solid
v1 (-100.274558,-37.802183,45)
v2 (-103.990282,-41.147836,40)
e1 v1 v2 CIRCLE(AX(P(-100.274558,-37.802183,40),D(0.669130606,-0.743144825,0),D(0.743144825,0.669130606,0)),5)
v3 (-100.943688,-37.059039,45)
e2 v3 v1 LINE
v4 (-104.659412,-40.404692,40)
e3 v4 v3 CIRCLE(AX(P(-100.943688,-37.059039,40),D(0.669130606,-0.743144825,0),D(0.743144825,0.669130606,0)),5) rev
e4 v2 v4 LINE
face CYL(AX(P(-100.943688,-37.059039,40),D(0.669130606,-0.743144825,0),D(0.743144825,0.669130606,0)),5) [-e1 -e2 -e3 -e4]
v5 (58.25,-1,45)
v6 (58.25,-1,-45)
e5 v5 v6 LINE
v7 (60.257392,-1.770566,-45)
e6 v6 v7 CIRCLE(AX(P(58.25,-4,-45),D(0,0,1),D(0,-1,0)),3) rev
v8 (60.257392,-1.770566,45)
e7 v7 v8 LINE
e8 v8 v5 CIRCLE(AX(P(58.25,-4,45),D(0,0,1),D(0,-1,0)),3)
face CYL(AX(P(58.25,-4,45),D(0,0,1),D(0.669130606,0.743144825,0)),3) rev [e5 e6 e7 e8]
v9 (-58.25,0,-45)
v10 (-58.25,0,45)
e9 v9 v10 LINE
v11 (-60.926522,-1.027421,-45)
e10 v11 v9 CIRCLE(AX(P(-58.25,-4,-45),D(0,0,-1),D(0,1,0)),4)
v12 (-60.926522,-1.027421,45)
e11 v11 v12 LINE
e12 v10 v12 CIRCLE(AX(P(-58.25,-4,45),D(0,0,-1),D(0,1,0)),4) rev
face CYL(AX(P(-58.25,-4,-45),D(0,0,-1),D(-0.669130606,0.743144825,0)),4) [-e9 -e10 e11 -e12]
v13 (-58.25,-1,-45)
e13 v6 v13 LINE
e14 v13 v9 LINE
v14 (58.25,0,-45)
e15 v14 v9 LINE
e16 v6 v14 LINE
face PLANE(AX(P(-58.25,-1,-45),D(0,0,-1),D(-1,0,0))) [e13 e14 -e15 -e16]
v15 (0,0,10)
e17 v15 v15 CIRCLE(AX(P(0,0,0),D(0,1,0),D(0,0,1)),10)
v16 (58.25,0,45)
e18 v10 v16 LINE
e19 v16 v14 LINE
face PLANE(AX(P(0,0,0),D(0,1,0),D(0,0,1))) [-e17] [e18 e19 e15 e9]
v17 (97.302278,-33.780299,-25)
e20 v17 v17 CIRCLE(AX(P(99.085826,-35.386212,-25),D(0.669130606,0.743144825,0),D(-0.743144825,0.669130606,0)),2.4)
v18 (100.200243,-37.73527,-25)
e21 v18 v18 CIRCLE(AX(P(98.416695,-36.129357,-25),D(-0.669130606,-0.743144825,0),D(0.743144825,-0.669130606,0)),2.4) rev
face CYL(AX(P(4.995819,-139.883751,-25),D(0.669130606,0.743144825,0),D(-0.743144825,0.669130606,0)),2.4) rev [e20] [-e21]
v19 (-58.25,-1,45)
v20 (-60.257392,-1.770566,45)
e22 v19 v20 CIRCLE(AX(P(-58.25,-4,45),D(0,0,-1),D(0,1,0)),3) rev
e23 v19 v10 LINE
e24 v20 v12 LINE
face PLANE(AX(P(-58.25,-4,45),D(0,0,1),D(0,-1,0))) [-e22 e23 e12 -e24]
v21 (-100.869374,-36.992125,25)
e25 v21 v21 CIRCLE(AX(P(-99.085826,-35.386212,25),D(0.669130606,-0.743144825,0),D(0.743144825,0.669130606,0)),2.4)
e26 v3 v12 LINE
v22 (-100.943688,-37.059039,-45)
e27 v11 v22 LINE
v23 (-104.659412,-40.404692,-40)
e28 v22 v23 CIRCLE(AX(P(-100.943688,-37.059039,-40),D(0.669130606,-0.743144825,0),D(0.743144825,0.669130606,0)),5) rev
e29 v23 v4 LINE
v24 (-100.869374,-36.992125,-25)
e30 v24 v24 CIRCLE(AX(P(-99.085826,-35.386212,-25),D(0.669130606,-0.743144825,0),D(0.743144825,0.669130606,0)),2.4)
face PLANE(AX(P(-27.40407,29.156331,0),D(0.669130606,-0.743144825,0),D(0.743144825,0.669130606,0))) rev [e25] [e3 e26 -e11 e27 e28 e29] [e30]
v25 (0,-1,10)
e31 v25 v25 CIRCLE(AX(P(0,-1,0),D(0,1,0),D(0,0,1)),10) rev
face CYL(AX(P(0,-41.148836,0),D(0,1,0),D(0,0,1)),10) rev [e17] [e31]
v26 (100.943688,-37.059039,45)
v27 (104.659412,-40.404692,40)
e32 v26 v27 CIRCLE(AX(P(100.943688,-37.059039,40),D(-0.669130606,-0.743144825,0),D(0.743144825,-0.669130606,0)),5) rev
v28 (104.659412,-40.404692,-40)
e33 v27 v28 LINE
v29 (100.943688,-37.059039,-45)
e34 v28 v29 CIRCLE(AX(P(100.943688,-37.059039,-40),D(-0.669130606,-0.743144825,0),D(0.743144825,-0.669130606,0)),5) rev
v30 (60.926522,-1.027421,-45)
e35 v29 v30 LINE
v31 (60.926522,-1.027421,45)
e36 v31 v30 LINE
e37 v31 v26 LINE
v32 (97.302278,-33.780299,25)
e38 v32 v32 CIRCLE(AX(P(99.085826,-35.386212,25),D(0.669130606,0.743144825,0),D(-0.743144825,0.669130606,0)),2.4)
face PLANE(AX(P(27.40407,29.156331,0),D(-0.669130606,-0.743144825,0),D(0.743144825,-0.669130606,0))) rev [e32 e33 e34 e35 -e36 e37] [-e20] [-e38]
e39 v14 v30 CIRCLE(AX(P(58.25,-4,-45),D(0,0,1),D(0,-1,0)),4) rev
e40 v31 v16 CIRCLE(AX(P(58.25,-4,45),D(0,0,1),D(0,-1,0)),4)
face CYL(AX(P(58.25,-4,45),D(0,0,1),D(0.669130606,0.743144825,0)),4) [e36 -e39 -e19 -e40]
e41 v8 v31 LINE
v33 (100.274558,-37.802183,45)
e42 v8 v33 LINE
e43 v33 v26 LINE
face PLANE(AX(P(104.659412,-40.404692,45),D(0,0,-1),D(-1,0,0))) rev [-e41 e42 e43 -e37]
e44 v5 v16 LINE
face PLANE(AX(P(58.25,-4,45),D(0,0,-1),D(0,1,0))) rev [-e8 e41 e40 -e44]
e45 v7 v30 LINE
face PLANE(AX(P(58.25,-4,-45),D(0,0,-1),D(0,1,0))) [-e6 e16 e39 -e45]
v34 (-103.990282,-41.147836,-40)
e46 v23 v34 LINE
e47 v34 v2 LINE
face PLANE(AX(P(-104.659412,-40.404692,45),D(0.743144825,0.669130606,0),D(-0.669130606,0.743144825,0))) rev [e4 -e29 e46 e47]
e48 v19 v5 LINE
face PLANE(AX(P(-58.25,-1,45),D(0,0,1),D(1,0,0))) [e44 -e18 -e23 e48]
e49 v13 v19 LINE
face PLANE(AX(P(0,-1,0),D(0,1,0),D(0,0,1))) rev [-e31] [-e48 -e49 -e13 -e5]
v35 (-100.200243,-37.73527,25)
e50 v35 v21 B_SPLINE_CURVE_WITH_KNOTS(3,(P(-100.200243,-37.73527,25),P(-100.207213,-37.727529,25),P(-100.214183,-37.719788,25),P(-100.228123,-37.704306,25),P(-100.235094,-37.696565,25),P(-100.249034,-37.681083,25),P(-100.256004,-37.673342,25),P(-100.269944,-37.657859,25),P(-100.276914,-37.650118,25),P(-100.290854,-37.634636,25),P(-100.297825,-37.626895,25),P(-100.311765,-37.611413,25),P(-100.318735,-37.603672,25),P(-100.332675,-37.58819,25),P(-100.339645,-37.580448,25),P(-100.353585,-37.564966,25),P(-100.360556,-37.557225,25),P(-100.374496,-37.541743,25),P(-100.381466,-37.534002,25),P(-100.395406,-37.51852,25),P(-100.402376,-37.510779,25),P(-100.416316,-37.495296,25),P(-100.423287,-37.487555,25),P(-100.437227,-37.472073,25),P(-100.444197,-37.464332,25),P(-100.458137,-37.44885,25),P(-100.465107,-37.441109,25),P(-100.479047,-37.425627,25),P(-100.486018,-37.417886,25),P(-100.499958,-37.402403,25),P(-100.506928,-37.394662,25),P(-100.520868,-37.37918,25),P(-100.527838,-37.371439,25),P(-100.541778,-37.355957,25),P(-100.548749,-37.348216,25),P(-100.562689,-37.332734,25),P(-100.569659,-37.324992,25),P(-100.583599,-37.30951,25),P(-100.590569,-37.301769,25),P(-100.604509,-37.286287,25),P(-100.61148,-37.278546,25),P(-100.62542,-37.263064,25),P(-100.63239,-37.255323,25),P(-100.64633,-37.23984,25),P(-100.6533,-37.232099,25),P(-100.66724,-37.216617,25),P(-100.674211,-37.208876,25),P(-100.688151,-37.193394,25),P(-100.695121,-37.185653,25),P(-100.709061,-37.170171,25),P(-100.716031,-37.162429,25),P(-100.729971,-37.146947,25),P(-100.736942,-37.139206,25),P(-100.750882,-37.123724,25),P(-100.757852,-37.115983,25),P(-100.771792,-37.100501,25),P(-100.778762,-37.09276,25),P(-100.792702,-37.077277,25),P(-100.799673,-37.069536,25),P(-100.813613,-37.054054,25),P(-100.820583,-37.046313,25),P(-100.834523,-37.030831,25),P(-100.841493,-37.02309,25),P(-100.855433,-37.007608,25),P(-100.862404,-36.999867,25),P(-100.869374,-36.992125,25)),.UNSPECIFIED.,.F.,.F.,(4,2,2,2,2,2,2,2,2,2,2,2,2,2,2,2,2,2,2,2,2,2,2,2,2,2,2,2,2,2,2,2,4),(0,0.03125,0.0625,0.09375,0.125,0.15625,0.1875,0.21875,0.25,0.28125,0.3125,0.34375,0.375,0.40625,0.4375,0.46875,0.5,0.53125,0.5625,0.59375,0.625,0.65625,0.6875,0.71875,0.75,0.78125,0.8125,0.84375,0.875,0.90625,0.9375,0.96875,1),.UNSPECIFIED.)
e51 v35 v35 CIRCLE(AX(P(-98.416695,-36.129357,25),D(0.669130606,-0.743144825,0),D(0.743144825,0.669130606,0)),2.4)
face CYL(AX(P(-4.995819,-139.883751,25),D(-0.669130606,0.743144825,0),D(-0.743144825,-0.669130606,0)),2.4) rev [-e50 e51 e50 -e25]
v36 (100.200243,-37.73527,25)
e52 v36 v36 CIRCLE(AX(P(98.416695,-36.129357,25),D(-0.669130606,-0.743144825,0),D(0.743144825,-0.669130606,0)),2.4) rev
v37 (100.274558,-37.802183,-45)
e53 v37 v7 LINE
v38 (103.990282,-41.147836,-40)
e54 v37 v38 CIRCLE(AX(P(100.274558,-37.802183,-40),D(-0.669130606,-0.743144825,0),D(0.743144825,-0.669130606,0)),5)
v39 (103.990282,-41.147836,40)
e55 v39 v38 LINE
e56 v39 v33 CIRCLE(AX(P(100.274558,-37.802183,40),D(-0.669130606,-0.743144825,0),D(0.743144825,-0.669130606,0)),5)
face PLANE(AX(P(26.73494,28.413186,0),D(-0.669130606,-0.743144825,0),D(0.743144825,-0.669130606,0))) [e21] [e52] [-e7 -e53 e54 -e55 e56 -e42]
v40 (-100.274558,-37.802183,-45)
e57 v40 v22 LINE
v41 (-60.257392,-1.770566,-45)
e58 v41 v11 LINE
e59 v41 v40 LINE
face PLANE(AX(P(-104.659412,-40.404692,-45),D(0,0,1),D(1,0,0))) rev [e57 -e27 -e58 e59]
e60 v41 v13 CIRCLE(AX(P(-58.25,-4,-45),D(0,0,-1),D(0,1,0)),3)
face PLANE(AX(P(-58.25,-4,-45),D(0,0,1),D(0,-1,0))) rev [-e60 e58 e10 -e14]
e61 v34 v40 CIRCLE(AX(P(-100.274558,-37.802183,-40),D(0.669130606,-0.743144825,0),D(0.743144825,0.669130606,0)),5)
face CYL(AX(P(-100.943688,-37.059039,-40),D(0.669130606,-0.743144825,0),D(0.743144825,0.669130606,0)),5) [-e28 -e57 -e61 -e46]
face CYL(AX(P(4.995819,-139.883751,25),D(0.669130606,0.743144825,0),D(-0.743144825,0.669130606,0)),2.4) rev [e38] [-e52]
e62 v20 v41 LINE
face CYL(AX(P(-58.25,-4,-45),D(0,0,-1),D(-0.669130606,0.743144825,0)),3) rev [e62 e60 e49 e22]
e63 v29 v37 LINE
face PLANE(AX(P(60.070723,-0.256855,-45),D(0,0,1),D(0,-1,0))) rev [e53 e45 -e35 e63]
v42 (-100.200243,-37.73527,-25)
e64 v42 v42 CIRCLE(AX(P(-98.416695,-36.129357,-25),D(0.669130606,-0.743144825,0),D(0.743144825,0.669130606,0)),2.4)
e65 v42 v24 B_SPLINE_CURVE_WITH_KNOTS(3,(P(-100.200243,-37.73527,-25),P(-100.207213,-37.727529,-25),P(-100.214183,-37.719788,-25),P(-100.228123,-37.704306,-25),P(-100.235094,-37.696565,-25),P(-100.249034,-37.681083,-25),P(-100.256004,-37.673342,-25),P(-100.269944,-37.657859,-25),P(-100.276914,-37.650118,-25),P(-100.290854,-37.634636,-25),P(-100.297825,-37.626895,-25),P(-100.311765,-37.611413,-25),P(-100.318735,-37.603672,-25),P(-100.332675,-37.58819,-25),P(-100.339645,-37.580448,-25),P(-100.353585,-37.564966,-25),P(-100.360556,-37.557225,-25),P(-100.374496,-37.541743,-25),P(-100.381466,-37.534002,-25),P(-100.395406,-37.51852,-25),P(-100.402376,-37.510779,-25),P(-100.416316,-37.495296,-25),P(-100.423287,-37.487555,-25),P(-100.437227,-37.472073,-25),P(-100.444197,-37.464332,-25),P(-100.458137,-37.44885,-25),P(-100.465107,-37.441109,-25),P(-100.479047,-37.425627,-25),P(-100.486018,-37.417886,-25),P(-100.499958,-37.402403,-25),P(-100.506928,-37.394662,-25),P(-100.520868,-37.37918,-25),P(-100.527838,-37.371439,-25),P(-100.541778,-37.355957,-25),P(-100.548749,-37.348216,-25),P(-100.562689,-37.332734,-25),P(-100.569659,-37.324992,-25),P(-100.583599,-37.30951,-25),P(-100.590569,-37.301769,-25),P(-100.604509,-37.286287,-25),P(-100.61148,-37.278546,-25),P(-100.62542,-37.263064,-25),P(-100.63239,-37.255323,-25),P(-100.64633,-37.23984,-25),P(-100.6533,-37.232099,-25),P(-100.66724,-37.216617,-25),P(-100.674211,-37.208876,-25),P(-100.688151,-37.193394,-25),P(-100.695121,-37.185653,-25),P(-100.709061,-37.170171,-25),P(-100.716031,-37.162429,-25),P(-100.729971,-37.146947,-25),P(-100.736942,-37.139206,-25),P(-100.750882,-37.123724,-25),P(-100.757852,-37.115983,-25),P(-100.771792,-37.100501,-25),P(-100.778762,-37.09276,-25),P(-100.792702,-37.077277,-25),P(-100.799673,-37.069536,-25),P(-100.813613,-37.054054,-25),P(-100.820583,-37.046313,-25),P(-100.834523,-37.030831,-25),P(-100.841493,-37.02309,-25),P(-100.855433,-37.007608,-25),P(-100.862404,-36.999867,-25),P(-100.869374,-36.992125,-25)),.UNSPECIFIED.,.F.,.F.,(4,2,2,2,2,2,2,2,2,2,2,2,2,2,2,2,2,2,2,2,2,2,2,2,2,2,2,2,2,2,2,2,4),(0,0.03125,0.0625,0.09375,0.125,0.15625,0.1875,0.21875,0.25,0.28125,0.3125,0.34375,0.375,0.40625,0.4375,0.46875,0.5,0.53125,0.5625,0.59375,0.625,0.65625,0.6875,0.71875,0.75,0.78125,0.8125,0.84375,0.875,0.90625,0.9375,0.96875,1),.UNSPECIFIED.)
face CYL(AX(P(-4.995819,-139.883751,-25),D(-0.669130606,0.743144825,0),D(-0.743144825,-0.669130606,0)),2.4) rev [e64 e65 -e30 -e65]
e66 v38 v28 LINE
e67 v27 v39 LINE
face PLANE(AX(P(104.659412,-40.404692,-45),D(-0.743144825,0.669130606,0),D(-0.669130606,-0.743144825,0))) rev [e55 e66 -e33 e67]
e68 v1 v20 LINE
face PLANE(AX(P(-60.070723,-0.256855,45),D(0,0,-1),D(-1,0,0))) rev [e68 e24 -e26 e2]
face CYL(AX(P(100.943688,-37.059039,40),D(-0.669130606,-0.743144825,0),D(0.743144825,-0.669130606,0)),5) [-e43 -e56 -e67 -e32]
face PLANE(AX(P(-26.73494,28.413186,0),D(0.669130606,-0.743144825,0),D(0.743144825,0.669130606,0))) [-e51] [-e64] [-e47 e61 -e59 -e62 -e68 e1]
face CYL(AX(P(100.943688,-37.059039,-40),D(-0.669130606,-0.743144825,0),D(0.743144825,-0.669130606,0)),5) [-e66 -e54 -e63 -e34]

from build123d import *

# Parameters (mm, degrees)
ESBO_O1_W                 = 116.5
ESBO_O1_H                 = 90
FLANGE_BASE1_DEPTH        = 1
ARESTA_FLANGE1_DEPTH      = 90
ARESTA_FLANGE1_BEND_DEPTH = 90
CORTE_EXTRUS_O1_REACH     = 157.954
ESBO_O12_R                = 2.4
FILETE1_R                 = 5
CORTE_EXTRUS_O2_REACH     = 123.127
ESBO_O13_R                = 10


# Sheet-metal steps are written as plain solids
with BuildPart() as part:
    # Esboço1 → Flange-base1 (new body)
    with BuildSketch(Plane(origin=(0, 0, 0), x_dir=(1, 0, 0), z_dir=(0, 1, 0))):
        Rectangle(ESBO_O1_W, ESBO_O1_H)
    extrude(amount=-FLANGE_BASE1_DEPTH)

    # Aresta-Flange1 section (across the edge) → Aresta-Flange1 (add)
    with BuildSketch(Plane(origin=(59.401592105, -1, -45), x_dir=(-0.6691306063588541, -0.7431448254773979, 0), z_dir=(0, 0, 1))):
        with BuildLine():
            Line((-1, 1.151592105), (-1, 60))
            Line((-1, 60), (0, 60))
            Line((0, 60), (0, 1.151592105))
            ThreePointArc((0, 1.151592105), (0.199258721, 0.076488256), (0.770565524, -0.855799714))
            Line((0.770565524, -0.855799714), (0.027420698, -1.52493032))
            ThreePointArc((0.027420698, -1.52493032), (-0.734321706, -0.281879693), (-1, 1.151592105))
        make_face()
    extrude(amount=ARESTA_FLANGE1_DEPTH)

    # Aresta-Flange1 section 2 (across the edge) → Aresta-Flange1 bend (add)
    with BuildSketch(Plane(origin=(-59.401592105, -1, 45), x_dir=(0.6691306063588541, -0.7431448254773979, 0), z_dir=(0, 0, -1))):
        with BuildLine():
            Line((-1, 1.151592105), (-1, 60))
            Line((-1, 60), (0, 60))
            Line((0, 60), (0, 1.151592105))
            ThreePointArc((0, 1.151592105), (0.199258721, 0.076488256), (0.770565524, -0.855799714))
            Line((0.770565524, -0.855799714), (0.027420698, -1.52493032))
            ThreePointArc((0.027420698, -1.52493032), (-0.734321706, -0.281879693), (-1, 1.151592105))
        make_face()
    extrude(amount=ARESTA_FLANGE1_BEND_DEPTH)

    # Esboço12 → Corte-extrusão1 (cut, up to next)
    with BuildSketch(Plane(origin=(26.768087142, 29.728972578, 0), x_dir=(0.7431448254773978, -0.6691306063588544, 0), z_dir=(0.6691306063588544, 0.7431448254773978, 0)), mode=Mode.PRIVATE) as corte_extrus_o1_sk1:
        with Locations(Location((97.313116404, -25, 0), (0, 0, 180))):
            Circle(ESBO_O12_R)
    corte_extrus_o1_tool1 = extrude(corte_extrus_o1_sk1.sketch, amount=-CORTE_EXTRUS_O1_REACH, mode=Mode.PRIVATE) & part.part
    # Esboço12 → Corte-extrusão1 (cut, up to next)
    with BuildSketch(Plane(origin=(26.768087142, 29.728972578, 0), x_dir=(0.7431448254773978, -0.6691306063588544, 0), z_dir=(0.6691306063588544, 0.7431448254773978, 0)), mode=Mode.PRIVATE) as corte_extrus_o1_sk2:
        with Locations(Location((97.313116404, 25, 0), (0, 0, 180))):
            Circle(ESBO_O12_R)
    corte_extrus_o1_tool2 = extrude(corte_extrus_o1_sk2.sketch, amount=-CORTE_EXTRUS_O1_REACH, mode=Mode.PRIVATE) & part.part
    corte_extrus_o1_1 = corte_extrus_o1_tool1.solids().sort_by_distance((99.085826, -35.386212, 25))[0]
    add(corte_extrus_o1_1, mode=Mode.SUBTRACT)
    corte_extrus_o1_2 = corte_extrus_o1_tool2.solids().sort_by_distance((99.085826, -35.386212, -25))[0]
    add(corte_extrus_o1_2, mode=Mode.SUBTRACT)
    corte_extrus_o1 = corte_extrus_o1_1 + corte_extrus_o1_2  # Corte-extrusão1 as one shape, for the pattern or mirror that repeats it

    # Espelhar1: Corte-extrusão1 across plane
    add(corte_extrus_o1.mirror(Plane(origin=(0, 0, 0), x_dir=(0, 0, 1), z_dir=(1, 0, 0))), mode=Mode.SUBTRACT)

    # Filete1
    filete1_edges = [part.edges().sort_by_distance(p)[0] for p in [
        (104.324846937, -40.776263969, -45),
        (104.324846937, -40.776263969, 45),
        (-104.324846937, -40.776263969, 45),
        (-104.324846937, -40.776263969, -45),
    ]]
    fillet(filete1_edges, radius=FILETE1_R)

    # Esboço13 → Corte-extrusão2 (cut, up to next)
    with BuildSketch(Plane(origin=(0, 0, 0), x_dir=(1, 0, 0), z_dir=(0, 1, 0)), mode=Mode.PRIVATE) as corte_extrus_o2_sk1:
        with Locations(Location((0, 0, 0), (0, 0, 270))):
            Circle(ESBO_O13_R)
    corte_extrus_o2_tool1 = extrude(corte_extrus_o2_sk1.sketch, amount=-CORTE_EXTRUS_O2_REACH, mode=Mode.PRIVATE) & part.part
    add(corte_extrus_o2_tool1.solids().sort_by_distance((0, 0, 0))[0], mode=Mode.SUBTRACT)


solid = part.part
